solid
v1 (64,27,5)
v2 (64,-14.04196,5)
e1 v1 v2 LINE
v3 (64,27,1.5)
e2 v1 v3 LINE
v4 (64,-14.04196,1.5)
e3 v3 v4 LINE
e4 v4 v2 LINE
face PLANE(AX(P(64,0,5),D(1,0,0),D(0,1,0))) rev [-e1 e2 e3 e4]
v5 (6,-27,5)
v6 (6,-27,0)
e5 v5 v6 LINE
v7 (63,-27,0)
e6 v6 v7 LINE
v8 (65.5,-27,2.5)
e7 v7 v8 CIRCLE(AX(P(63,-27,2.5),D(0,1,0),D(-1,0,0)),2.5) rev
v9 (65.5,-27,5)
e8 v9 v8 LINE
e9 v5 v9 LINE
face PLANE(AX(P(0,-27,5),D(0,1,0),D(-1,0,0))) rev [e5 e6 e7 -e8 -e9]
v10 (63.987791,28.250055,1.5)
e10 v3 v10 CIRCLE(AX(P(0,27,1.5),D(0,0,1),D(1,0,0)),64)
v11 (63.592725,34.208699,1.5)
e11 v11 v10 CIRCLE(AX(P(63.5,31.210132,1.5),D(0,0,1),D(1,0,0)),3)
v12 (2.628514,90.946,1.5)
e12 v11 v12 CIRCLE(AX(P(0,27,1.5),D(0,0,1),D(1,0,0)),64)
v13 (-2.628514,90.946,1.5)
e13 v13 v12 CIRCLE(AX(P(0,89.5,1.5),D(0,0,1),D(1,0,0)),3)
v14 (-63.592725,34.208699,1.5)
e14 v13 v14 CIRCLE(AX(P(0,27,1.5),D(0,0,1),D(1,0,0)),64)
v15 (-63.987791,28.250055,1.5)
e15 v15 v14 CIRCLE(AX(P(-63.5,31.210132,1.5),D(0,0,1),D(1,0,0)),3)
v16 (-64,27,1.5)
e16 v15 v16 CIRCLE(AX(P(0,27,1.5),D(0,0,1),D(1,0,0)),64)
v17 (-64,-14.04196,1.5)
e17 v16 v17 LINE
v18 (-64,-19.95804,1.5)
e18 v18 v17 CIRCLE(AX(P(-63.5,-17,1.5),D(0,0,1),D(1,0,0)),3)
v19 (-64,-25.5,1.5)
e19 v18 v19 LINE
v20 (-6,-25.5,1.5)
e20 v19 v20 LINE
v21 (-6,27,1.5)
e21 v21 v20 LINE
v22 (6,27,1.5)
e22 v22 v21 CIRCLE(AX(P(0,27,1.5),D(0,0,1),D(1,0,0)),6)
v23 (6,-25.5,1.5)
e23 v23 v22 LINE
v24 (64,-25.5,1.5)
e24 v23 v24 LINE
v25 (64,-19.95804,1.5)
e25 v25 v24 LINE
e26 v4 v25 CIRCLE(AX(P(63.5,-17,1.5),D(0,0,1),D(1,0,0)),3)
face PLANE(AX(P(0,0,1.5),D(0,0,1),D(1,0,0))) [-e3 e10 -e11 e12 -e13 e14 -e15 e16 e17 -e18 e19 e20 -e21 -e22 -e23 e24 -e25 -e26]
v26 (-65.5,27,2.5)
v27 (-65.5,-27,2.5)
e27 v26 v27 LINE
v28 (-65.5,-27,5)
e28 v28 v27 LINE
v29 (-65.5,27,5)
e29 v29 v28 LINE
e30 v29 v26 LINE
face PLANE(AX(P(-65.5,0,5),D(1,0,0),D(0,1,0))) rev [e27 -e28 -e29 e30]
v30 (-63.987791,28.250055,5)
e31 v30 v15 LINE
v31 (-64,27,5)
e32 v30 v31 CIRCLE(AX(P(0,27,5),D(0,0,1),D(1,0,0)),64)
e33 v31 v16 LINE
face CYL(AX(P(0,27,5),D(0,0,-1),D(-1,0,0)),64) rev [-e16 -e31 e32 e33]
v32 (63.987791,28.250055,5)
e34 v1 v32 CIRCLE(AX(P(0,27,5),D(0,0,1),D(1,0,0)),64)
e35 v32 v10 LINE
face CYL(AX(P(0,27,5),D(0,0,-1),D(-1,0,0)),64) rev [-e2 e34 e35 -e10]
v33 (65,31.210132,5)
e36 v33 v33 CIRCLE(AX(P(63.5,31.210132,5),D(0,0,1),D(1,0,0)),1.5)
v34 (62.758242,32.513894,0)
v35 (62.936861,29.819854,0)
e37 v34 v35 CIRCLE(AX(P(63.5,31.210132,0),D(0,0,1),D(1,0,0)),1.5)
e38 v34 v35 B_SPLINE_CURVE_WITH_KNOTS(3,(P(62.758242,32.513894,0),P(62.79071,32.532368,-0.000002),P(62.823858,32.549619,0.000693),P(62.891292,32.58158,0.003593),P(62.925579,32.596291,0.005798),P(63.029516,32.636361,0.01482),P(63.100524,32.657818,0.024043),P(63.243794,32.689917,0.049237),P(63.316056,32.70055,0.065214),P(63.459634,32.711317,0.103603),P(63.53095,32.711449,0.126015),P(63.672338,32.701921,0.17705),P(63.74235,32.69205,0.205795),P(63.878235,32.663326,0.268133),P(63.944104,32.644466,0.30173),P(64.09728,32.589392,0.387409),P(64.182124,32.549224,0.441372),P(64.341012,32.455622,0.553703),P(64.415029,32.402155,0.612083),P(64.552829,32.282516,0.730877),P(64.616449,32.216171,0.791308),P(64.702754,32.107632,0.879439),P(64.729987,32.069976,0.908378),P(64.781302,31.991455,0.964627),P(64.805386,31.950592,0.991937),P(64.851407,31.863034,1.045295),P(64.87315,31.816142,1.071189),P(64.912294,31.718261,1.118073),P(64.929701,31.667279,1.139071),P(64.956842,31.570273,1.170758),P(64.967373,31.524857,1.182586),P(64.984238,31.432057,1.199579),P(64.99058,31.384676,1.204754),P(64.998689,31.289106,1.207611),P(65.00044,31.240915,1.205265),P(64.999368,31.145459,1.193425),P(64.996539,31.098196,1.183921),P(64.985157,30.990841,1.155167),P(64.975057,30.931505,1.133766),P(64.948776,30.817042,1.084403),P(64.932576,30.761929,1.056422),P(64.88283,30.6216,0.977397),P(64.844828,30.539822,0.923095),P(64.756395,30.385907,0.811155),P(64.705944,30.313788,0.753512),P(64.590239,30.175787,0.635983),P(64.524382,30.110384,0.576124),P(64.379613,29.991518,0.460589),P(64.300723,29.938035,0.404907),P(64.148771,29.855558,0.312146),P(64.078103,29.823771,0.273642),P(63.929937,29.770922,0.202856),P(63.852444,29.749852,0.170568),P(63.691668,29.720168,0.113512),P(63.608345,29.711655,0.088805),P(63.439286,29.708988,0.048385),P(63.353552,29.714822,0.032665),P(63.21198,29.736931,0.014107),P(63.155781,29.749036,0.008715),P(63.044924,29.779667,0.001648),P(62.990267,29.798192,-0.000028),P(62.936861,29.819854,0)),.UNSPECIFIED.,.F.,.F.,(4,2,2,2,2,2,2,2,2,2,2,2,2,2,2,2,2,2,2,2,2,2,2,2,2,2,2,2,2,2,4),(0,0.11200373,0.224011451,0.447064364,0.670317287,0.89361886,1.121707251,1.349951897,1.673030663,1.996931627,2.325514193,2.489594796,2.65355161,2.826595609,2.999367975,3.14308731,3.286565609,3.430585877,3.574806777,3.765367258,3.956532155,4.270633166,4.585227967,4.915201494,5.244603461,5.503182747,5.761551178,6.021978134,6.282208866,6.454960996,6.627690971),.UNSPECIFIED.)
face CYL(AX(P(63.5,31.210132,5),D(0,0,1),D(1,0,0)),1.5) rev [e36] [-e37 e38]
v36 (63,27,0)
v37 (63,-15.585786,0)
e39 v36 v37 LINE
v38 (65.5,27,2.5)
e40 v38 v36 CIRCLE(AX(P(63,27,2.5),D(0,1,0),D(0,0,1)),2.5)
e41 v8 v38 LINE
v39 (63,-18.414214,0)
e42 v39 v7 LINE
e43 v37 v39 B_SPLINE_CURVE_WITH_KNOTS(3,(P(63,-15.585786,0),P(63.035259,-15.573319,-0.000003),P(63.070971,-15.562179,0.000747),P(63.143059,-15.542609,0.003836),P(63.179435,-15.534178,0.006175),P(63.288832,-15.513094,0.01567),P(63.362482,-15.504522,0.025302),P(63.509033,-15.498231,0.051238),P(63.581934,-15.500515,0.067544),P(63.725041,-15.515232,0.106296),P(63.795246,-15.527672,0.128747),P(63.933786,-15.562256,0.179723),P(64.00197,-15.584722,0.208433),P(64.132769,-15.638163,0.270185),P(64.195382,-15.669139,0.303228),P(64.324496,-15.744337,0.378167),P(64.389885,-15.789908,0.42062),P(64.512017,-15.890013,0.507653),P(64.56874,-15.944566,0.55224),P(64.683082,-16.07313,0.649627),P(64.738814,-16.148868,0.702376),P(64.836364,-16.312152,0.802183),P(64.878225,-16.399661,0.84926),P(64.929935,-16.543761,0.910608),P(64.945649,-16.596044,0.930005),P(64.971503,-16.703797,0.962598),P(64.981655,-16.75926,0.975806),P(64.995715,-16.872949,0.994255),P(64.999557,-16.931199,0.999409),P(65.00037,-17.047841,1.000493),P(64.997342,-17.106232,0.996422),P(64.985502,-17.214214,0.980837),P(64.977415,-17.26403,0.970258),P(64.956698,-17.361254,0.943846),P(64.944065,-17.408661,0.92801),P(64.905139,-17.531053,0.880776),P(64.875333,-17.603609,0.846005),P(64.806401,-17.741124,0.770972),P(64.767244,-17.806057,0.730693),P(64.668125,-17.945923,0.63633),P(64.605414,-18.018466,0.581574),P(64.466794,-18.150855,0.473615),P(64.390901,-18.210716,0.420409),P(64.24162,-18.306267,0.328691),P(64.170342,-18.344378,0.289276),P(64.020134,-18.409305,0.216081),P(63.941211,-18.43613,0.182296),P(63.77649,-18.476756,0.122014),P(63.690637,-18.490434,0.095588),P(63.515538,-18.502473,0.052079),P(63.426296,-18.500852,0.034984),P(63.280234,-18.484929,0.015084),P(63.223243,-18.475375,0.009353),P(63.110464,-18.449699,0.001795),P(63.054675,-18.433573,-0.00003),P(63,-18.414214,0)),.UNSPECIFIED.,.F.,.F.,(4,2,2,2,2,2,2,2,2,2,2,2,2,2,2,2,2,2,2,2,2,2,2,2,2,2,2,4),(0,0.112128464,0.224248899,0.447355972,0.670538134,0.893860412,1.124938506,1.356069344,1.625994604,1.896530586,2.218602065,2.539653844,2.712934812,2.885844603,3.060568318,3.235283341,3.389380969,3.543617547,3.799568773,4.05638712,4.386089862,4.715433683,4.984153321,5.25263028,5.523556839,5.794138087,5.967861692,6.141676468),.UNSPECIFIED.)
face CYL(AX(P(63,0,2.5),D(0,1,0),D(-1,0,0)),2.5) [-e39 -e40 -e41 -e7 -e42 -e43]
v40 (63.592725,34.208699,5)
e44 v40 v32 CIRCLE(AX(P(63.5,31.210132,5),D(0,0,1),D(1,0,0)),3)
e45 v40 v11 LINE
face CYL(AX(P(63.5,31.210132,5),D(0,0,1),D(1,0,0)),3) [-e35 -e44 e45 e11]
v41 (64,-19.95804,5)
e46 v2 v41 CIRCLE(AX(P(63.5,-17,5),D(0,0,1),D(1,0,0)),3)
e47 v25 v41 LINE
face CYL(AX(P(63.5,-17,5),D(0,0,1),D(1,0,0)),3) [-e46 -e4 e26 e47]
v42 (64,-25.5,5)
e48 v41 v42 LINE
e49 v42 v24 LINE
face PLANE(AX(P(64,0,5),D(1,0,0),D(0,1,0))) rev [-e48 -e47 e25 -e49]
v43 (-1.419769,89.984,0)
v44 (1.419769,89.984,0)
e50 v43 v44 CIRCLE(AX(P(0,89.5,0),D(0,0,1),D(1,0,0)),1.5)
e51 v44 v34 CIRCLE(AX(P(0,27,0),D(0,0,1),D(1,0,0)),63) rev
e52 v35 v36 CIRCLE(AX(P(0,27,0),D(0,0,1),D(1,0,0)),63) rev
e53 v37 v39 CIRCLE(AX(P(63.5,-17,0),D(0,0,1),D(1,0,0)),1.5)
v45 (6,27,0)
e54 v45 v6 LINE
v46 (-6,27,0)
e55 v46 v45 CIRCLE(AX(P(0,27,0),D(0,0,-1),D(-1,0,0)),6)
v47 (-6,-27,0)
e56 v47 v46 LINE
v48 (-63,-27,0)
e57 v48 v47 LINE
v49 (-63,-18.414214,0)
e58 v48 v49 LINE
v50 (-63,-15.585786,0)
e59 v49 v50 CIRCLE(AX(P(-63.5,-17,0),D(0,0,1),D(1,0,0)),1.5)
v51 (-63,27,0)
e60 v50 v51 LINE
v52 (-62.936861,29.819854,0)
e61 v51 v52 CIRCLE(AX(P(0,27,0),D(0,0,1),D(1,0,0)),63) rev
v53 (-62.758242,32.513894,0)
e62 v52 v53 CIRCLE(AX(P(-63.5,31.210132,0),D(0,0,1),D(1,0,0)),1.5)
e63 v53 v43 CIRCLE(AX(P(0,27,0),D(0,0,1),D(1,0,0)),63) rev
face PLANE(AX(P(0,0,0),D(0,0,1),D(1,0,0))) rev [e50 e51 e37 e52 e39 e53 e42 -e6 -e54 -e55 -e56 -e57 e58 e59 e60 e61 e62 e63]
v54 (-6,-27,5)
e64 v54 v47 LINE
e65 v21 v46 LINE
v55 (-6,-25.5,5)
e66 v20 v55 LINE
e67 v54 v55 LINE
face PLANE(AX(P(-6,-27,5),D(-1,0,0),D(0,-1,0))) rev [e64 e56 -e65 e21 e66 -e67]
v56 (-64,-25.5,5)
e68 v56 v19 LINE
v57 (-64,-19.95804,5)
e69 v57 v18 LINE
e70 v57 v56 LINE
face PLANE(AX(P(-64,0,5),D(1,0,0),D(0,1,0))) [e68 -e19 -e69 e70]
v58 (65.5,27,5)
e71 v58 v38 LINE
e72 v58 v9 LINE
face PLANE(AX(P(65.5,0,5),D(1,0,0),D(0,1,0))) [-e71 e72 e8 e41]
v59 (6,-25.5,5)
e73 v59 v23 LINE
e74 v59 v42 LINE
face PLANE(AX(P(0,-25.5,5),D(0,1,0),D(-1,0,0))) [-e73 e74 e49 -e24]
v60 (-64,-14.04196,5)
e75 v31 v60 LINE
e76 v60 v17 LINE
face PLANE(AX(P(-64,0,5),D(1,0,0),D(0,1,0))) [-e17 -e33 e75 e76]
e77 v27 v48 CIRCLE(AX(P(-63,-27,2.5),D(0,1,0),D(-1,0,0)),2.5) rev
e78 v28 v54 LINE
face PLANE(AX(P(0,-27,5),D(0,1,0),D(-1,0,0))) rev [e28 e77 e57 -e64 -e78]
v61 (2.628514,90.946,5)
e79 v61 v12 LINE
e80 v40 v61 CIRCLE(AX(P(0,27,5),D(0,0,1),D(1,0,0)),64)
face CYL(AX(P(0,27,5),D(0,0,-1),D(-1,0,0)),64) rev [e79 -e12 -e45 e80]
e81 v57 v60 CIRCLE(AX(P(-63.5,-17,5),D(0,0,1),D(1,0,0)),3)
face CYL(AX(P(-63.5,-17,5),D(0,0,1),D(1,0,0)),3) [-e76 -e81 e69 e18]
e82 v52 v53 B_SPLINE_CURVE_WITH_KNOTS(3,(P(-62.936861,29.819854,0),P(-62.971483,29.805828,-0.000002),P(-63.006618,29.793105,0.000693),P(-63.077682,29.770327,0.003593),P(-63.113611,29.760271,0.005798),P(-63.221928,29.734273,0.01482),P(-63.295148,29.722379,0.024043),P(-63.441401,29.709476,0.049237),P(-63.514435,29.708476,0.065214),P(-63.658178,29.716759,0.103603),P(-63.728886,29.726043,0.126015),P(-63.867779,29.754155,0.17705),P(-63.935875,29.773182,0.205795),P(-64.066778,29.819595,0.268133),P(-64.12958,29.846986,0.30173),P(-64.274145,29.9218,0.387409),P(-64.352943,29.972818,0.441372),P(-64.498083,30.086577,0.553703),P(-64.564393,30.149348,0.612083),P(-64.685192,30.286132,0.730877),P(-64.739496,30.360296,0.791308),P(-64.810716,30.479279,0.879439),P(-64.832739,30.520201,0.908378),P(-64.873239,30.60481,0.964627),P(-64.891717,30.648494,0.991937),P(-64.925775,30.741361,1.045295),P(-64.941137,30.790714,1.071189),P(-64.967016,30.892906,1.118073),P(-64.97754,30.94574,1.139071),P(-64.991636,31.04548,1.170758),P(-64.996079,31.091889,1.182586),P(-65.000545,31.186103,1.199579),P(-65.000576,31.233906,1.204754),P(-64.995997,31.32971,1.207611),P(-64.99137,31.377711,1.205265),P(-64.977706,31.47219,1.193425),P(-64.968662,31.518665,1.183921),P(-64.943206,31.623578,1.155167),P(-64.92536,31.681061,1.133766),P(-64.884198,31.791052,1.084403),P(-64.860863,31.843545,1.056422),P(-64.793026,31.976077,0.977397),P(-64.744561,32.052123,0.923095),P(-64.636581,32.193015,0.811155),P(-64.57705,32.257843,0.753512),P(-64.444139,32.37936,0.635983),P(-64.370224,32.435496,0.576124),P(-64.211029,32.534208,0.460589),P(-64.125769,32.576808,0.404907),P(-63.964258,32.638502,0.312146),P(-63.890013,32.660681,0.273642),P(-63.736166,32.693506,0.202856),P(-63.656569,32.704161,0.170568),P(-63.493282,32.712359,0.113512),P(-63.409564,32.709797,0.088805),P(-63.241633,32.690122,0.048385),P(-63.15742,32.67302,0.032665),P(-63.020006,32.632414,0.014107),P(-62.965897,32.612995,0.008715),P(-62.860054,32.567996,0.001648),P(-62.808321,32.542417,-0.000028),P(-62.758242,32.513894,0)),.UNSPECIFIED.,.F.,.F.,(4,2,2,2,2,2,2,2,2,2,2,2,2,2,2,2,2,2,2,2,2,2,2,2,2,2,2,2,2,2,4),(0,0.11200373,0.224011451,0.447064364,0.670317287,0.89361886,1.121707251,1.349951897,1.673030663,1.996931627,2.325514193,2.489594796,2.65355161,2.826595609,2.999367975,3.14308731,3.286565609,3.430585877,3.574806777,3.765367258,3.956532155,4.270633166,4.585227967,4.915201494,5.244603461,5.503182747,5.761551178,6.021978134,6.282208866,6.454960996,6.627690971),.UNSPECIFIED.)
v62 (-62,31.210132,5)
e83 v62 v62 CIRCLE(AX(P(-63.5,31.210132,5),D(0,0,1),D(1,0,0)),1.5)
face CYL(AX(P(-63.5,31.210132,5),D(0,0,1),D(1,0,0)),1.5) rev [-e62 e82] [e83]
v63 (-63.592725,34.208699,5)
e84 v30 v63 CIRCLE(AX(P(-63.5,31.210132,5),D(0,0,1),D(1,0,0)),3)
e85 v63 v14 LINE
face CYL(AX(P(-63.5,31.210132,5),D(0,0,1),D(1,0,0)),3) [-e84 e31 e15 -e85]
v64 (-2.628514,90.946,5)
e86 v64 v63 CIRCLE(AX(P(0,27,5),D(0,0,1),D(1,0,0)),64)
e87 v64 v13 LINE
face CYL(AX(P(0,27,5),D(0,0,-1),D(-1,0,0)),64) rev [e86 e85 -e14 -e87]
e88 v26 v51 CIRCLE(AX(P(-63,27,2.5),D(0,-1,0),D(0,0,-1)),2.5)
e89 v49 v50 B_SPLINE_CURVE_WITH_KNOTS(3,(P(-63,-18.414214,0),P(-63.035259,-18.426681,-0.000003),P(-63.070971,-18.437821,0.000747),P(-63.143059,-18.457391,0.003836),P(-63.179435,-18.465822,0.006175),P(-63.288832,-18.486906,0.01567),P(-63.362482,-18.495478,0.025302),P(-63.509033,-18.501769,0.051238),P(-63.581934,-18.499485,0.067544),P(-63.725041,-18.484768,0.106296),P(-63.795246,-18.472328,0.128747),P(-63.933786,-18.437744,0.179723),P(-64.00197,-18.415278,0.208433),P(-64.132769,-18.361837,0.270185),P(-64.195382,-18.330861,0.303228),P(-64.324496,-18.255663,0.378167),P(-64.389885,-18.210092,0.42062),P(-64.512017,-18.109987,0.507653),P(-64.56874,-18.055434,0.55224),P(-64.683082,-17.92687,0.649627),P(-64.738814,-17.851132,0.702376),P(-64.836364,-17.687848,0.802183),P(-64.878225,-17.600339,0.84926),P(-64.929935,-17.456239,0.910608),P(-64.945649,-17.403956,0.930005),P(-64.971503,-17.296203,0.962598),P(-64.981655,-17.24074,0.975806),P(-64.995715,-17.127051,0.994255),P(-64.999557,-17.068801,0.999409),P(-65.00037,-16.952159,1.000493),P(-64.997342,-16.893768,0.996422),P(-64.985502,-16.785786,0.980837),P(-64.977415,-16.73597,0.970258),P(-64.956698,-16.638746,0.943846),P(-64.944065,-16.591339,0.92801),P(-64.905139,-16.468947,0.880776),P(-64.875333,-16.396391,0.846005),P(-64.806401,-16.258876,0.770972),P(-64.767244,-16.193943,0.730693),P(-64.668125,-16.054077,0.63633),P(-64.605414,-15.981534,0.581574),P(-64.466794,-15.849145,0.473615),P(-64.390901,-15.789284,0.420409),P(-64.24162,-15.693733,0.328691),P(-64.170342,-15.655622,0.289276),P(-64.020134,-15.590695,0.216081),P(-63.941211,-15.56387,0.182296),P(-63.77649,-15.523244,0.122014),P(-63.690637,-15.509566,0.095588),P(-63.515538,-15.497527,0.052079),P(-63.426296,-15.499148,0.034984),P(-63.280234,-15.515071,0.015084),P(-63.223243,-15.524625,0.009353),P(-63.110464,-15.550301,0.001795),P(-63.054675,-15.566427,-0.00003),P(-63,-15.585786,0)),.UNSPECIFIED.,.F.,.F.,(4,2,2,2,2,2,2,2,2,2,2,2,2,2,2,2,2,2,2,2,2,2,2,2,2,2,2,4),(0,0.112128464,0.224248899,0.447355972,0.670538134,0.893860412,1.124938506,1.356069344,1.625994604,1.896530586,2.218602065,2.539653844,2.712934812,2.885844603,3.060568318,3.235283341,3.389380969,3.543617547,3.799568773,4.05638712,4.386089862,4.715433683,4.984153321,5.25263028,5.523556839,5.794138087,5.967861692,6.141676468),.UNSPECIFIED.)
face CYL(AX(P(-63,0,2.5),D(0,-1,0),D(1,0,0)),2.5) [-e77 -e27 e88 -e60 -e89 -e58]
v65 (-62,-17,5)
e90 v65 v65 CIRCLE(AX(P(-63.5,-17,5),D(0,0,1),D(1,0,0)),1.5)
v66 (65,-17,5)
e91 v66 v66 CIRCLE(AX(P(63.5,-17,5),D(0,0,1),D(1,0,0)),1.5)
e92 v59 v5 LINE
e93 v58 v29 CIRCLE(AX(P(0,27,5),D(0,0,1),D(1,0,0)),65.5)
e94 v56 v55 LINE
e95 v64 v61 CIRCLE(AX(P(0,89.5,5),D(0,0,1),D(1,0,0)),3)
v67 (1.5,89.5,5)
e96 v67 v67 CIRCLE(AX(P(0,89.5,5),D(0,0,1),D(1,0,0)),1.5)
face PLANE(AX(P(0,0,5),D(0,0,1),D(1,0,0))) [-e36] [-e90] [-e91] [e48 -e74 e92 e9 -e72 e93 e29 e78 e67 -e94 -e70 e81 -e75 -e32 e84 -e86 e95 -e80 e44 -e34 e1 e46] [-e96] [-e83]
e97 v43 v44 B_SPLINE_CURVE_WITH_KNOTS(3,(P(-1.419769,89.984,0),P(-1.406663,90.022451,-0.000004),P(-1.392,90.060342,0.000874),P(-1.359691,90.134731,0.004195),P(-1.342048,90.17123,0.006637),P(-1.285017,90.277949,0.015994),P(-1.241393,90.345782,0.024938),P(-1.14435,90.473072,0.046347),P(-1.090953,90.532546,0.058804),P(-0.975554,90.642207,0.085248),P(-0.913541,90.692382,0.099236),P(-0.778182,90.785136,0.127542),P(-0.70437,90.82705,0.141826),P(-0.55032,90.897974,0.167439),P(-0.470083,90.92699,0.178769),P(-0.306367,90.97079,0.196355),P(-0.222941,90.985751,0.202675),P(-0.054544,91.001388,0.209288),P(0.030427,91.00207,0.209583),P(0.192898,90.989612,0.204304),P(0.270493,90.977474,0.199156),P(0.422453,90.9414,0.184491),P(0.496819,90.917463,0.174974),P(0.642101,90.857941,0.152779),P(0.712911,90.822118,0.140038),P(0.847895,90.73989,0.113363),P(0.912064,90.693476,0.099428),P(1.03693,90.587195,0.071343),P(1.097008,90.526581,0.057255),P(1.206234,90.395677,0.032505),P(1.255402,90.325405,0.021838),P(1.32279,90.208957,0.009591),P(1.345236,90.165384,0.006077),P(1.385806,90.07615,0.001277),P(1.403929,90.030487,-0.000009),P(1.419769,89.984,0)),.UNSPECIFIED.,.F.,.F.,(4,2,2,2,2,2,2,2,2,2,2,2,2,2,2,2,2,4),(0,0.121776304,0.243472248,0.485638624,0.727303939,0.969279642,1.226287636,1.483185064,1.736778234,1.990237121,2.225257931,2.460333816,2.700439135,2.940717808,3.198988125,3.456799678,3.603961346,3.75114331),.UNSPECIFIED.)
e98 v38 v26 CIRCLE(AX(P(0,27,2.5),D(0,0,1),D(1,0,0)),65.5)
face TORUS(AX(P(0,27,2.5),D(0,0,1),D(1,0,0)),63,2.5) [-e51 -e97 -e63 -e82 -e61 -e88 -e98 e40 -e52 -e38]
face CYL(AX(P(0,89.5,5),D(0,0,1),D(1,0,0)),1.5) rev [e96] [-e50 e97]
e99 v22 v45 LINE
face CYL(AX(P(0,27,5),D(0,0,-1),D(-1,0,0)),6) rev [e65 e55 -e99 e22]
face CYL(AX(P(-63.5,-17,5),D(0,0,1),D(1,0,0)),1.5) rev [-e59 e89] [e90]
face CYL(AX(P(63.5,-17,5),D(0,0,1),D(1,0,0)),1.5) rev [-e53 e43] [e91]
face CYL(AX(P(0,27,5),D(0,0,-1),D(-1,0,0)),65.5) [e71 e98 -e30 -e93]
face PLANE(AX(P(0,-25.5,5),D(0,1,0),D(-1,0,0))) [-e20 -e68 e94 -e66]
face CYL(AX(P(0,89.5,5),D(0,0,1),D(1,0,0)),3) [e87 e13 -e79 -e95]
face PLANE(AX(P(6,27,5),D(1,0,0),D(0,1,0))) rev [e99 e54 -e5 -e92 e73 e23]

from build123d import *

# Parameters (mm, degrees)
SKETCH3_W                    = 131
SKETCH3_H                    = 54
BOSS_EXTRUDE2_DEPTH          = 5
F_3_0_3_DIAMETER_HOLE1_D     = 3
F_3_0_3_DIAMETER_HOLE1_DEPTH = 20
F_3_0_3_DIAMETER_HOLE1_TIP   = 0.901290929
SHELL1_T                     = -1.5
CUT_EXTRUDE1_DEPTH           = 114.452633288
FILLET2_START                = -28
FILLET2_DEPTH                = 120.497573337
FILLET2_2_ANGLE              = 180


with BuildPart() as part:
    # Sketch3 → Boss-Extrude2 (new body)
    with BuildSketch(Plane.XY):
        with BuildLine():
            Line((-65.5, 27), (65.5, 27))
            ThreePointArc((65.5, 27), (0, 92.5), (-65.5, 27))
        make_face()
        Rectangle(SKETCH3_W, SKETCH3_H)
    extrude(amount=BOSS_EXTRUDE2_DEPTH)

    # Ø3.0 (3) Diameter Hole1
    with Locations(Plane.XY.offset(5)):
        with Locations((-63.5, -17), (63.5, -17), (0, 89.5), (63.5, 31.210132452), (-63.5, 31.210132452)):
            Hole(F_3_0_3_DIAMETER_HOLE1_D / 2, depth=F_3_0_3_DIAMETER_HOLE1_DEPTH)
            with Locations((0, 0, -(F_3_0_3_DIAMETER_HOLE1_DEPTH + F_3_0_3_DIAMETER_HOLE1_TIP / 2))):  # 118° drill point
                Cone(0, F_3_0_3_DIAMETER_HOLE1_D / 2, F_3_0_3_DIAMETER_HOLE1_TIP, mode=Mode.SUBTRACT)

    # Shell1
    shell1_openings = [part.faces().sort_by_distance(p)[0] for p in [
        (0, 26.743328941, 5),
    ]]
    offset(amount=SHELL1_T, openings=shell1_openings)

    # Sketch6 → Cut-Extrude1 (cut, through all)
    with BuildSketch(Plane(origin=(0, 0, 0), x_dir=(-1, 0, 0), z_dir=(0, 0, -1))):
        with BuildLine():
            Line((-6, 27), (-6, -27))
            Line((-6, -27), (6, -27))
            Line((6, -27), (6, 27))
            ThreePointArc((6, 27), (0, 33), (-6, 27))
        make_face()
    extrude(amount=-CUT_EXTRUDE1_DEPTH, mode=Mode.SUBTRACT)

    # Fillet2: read off the stored shape, not the designer's step
    # Fillet2 outline → Fillet2 (cut)
    with BuildSketch(Plane(origin=(0, 0, 0), x_dir=(1, 0, 0), z_dir=(0, 1, 0)).offset(FILLET2_START)):
        with BuildLine():
            ThreePointArc((-65.5, -2.5), (-64.767766953, -0.732233047), (-63, 0))
            Line((-63, 0), (-65.5, 0))
            Line((-65.5, 0), (-65.5, -2.5))
        make_face()
        with BuildLine():
            ThreePointArc((63, 0), (64.767766953, -0.732233047), (65.5, -2.5))
            Line((65.5, -2.5), (65.5, 0))
            Line((65.5, 0), (63, 0))
        make_face()
    extrude(amount=FILLET2_DEPTH, mode=Mode.SUBTRACT)

    # Fillet2 2 outline → Fillet2 2 (revolve, cut)
    with BuildSketch(Plane.XZ.offset(-27)):
        with BuildLine():
            ThreePointArc((65.5, 2.5), (64.767766953, 0.732233047), (63, 0))
            Line((63, 0), (65.5, 0))
            Line((65.5, 0), (65.5, 2.5))
        make_face()
    revolve(axis=Axis((0, 27, 0), (0, 0, 1)), revolution_arc=FILLET2_2_ANGLE, mode=Mode.SUBTRACT)


solid = part.part
